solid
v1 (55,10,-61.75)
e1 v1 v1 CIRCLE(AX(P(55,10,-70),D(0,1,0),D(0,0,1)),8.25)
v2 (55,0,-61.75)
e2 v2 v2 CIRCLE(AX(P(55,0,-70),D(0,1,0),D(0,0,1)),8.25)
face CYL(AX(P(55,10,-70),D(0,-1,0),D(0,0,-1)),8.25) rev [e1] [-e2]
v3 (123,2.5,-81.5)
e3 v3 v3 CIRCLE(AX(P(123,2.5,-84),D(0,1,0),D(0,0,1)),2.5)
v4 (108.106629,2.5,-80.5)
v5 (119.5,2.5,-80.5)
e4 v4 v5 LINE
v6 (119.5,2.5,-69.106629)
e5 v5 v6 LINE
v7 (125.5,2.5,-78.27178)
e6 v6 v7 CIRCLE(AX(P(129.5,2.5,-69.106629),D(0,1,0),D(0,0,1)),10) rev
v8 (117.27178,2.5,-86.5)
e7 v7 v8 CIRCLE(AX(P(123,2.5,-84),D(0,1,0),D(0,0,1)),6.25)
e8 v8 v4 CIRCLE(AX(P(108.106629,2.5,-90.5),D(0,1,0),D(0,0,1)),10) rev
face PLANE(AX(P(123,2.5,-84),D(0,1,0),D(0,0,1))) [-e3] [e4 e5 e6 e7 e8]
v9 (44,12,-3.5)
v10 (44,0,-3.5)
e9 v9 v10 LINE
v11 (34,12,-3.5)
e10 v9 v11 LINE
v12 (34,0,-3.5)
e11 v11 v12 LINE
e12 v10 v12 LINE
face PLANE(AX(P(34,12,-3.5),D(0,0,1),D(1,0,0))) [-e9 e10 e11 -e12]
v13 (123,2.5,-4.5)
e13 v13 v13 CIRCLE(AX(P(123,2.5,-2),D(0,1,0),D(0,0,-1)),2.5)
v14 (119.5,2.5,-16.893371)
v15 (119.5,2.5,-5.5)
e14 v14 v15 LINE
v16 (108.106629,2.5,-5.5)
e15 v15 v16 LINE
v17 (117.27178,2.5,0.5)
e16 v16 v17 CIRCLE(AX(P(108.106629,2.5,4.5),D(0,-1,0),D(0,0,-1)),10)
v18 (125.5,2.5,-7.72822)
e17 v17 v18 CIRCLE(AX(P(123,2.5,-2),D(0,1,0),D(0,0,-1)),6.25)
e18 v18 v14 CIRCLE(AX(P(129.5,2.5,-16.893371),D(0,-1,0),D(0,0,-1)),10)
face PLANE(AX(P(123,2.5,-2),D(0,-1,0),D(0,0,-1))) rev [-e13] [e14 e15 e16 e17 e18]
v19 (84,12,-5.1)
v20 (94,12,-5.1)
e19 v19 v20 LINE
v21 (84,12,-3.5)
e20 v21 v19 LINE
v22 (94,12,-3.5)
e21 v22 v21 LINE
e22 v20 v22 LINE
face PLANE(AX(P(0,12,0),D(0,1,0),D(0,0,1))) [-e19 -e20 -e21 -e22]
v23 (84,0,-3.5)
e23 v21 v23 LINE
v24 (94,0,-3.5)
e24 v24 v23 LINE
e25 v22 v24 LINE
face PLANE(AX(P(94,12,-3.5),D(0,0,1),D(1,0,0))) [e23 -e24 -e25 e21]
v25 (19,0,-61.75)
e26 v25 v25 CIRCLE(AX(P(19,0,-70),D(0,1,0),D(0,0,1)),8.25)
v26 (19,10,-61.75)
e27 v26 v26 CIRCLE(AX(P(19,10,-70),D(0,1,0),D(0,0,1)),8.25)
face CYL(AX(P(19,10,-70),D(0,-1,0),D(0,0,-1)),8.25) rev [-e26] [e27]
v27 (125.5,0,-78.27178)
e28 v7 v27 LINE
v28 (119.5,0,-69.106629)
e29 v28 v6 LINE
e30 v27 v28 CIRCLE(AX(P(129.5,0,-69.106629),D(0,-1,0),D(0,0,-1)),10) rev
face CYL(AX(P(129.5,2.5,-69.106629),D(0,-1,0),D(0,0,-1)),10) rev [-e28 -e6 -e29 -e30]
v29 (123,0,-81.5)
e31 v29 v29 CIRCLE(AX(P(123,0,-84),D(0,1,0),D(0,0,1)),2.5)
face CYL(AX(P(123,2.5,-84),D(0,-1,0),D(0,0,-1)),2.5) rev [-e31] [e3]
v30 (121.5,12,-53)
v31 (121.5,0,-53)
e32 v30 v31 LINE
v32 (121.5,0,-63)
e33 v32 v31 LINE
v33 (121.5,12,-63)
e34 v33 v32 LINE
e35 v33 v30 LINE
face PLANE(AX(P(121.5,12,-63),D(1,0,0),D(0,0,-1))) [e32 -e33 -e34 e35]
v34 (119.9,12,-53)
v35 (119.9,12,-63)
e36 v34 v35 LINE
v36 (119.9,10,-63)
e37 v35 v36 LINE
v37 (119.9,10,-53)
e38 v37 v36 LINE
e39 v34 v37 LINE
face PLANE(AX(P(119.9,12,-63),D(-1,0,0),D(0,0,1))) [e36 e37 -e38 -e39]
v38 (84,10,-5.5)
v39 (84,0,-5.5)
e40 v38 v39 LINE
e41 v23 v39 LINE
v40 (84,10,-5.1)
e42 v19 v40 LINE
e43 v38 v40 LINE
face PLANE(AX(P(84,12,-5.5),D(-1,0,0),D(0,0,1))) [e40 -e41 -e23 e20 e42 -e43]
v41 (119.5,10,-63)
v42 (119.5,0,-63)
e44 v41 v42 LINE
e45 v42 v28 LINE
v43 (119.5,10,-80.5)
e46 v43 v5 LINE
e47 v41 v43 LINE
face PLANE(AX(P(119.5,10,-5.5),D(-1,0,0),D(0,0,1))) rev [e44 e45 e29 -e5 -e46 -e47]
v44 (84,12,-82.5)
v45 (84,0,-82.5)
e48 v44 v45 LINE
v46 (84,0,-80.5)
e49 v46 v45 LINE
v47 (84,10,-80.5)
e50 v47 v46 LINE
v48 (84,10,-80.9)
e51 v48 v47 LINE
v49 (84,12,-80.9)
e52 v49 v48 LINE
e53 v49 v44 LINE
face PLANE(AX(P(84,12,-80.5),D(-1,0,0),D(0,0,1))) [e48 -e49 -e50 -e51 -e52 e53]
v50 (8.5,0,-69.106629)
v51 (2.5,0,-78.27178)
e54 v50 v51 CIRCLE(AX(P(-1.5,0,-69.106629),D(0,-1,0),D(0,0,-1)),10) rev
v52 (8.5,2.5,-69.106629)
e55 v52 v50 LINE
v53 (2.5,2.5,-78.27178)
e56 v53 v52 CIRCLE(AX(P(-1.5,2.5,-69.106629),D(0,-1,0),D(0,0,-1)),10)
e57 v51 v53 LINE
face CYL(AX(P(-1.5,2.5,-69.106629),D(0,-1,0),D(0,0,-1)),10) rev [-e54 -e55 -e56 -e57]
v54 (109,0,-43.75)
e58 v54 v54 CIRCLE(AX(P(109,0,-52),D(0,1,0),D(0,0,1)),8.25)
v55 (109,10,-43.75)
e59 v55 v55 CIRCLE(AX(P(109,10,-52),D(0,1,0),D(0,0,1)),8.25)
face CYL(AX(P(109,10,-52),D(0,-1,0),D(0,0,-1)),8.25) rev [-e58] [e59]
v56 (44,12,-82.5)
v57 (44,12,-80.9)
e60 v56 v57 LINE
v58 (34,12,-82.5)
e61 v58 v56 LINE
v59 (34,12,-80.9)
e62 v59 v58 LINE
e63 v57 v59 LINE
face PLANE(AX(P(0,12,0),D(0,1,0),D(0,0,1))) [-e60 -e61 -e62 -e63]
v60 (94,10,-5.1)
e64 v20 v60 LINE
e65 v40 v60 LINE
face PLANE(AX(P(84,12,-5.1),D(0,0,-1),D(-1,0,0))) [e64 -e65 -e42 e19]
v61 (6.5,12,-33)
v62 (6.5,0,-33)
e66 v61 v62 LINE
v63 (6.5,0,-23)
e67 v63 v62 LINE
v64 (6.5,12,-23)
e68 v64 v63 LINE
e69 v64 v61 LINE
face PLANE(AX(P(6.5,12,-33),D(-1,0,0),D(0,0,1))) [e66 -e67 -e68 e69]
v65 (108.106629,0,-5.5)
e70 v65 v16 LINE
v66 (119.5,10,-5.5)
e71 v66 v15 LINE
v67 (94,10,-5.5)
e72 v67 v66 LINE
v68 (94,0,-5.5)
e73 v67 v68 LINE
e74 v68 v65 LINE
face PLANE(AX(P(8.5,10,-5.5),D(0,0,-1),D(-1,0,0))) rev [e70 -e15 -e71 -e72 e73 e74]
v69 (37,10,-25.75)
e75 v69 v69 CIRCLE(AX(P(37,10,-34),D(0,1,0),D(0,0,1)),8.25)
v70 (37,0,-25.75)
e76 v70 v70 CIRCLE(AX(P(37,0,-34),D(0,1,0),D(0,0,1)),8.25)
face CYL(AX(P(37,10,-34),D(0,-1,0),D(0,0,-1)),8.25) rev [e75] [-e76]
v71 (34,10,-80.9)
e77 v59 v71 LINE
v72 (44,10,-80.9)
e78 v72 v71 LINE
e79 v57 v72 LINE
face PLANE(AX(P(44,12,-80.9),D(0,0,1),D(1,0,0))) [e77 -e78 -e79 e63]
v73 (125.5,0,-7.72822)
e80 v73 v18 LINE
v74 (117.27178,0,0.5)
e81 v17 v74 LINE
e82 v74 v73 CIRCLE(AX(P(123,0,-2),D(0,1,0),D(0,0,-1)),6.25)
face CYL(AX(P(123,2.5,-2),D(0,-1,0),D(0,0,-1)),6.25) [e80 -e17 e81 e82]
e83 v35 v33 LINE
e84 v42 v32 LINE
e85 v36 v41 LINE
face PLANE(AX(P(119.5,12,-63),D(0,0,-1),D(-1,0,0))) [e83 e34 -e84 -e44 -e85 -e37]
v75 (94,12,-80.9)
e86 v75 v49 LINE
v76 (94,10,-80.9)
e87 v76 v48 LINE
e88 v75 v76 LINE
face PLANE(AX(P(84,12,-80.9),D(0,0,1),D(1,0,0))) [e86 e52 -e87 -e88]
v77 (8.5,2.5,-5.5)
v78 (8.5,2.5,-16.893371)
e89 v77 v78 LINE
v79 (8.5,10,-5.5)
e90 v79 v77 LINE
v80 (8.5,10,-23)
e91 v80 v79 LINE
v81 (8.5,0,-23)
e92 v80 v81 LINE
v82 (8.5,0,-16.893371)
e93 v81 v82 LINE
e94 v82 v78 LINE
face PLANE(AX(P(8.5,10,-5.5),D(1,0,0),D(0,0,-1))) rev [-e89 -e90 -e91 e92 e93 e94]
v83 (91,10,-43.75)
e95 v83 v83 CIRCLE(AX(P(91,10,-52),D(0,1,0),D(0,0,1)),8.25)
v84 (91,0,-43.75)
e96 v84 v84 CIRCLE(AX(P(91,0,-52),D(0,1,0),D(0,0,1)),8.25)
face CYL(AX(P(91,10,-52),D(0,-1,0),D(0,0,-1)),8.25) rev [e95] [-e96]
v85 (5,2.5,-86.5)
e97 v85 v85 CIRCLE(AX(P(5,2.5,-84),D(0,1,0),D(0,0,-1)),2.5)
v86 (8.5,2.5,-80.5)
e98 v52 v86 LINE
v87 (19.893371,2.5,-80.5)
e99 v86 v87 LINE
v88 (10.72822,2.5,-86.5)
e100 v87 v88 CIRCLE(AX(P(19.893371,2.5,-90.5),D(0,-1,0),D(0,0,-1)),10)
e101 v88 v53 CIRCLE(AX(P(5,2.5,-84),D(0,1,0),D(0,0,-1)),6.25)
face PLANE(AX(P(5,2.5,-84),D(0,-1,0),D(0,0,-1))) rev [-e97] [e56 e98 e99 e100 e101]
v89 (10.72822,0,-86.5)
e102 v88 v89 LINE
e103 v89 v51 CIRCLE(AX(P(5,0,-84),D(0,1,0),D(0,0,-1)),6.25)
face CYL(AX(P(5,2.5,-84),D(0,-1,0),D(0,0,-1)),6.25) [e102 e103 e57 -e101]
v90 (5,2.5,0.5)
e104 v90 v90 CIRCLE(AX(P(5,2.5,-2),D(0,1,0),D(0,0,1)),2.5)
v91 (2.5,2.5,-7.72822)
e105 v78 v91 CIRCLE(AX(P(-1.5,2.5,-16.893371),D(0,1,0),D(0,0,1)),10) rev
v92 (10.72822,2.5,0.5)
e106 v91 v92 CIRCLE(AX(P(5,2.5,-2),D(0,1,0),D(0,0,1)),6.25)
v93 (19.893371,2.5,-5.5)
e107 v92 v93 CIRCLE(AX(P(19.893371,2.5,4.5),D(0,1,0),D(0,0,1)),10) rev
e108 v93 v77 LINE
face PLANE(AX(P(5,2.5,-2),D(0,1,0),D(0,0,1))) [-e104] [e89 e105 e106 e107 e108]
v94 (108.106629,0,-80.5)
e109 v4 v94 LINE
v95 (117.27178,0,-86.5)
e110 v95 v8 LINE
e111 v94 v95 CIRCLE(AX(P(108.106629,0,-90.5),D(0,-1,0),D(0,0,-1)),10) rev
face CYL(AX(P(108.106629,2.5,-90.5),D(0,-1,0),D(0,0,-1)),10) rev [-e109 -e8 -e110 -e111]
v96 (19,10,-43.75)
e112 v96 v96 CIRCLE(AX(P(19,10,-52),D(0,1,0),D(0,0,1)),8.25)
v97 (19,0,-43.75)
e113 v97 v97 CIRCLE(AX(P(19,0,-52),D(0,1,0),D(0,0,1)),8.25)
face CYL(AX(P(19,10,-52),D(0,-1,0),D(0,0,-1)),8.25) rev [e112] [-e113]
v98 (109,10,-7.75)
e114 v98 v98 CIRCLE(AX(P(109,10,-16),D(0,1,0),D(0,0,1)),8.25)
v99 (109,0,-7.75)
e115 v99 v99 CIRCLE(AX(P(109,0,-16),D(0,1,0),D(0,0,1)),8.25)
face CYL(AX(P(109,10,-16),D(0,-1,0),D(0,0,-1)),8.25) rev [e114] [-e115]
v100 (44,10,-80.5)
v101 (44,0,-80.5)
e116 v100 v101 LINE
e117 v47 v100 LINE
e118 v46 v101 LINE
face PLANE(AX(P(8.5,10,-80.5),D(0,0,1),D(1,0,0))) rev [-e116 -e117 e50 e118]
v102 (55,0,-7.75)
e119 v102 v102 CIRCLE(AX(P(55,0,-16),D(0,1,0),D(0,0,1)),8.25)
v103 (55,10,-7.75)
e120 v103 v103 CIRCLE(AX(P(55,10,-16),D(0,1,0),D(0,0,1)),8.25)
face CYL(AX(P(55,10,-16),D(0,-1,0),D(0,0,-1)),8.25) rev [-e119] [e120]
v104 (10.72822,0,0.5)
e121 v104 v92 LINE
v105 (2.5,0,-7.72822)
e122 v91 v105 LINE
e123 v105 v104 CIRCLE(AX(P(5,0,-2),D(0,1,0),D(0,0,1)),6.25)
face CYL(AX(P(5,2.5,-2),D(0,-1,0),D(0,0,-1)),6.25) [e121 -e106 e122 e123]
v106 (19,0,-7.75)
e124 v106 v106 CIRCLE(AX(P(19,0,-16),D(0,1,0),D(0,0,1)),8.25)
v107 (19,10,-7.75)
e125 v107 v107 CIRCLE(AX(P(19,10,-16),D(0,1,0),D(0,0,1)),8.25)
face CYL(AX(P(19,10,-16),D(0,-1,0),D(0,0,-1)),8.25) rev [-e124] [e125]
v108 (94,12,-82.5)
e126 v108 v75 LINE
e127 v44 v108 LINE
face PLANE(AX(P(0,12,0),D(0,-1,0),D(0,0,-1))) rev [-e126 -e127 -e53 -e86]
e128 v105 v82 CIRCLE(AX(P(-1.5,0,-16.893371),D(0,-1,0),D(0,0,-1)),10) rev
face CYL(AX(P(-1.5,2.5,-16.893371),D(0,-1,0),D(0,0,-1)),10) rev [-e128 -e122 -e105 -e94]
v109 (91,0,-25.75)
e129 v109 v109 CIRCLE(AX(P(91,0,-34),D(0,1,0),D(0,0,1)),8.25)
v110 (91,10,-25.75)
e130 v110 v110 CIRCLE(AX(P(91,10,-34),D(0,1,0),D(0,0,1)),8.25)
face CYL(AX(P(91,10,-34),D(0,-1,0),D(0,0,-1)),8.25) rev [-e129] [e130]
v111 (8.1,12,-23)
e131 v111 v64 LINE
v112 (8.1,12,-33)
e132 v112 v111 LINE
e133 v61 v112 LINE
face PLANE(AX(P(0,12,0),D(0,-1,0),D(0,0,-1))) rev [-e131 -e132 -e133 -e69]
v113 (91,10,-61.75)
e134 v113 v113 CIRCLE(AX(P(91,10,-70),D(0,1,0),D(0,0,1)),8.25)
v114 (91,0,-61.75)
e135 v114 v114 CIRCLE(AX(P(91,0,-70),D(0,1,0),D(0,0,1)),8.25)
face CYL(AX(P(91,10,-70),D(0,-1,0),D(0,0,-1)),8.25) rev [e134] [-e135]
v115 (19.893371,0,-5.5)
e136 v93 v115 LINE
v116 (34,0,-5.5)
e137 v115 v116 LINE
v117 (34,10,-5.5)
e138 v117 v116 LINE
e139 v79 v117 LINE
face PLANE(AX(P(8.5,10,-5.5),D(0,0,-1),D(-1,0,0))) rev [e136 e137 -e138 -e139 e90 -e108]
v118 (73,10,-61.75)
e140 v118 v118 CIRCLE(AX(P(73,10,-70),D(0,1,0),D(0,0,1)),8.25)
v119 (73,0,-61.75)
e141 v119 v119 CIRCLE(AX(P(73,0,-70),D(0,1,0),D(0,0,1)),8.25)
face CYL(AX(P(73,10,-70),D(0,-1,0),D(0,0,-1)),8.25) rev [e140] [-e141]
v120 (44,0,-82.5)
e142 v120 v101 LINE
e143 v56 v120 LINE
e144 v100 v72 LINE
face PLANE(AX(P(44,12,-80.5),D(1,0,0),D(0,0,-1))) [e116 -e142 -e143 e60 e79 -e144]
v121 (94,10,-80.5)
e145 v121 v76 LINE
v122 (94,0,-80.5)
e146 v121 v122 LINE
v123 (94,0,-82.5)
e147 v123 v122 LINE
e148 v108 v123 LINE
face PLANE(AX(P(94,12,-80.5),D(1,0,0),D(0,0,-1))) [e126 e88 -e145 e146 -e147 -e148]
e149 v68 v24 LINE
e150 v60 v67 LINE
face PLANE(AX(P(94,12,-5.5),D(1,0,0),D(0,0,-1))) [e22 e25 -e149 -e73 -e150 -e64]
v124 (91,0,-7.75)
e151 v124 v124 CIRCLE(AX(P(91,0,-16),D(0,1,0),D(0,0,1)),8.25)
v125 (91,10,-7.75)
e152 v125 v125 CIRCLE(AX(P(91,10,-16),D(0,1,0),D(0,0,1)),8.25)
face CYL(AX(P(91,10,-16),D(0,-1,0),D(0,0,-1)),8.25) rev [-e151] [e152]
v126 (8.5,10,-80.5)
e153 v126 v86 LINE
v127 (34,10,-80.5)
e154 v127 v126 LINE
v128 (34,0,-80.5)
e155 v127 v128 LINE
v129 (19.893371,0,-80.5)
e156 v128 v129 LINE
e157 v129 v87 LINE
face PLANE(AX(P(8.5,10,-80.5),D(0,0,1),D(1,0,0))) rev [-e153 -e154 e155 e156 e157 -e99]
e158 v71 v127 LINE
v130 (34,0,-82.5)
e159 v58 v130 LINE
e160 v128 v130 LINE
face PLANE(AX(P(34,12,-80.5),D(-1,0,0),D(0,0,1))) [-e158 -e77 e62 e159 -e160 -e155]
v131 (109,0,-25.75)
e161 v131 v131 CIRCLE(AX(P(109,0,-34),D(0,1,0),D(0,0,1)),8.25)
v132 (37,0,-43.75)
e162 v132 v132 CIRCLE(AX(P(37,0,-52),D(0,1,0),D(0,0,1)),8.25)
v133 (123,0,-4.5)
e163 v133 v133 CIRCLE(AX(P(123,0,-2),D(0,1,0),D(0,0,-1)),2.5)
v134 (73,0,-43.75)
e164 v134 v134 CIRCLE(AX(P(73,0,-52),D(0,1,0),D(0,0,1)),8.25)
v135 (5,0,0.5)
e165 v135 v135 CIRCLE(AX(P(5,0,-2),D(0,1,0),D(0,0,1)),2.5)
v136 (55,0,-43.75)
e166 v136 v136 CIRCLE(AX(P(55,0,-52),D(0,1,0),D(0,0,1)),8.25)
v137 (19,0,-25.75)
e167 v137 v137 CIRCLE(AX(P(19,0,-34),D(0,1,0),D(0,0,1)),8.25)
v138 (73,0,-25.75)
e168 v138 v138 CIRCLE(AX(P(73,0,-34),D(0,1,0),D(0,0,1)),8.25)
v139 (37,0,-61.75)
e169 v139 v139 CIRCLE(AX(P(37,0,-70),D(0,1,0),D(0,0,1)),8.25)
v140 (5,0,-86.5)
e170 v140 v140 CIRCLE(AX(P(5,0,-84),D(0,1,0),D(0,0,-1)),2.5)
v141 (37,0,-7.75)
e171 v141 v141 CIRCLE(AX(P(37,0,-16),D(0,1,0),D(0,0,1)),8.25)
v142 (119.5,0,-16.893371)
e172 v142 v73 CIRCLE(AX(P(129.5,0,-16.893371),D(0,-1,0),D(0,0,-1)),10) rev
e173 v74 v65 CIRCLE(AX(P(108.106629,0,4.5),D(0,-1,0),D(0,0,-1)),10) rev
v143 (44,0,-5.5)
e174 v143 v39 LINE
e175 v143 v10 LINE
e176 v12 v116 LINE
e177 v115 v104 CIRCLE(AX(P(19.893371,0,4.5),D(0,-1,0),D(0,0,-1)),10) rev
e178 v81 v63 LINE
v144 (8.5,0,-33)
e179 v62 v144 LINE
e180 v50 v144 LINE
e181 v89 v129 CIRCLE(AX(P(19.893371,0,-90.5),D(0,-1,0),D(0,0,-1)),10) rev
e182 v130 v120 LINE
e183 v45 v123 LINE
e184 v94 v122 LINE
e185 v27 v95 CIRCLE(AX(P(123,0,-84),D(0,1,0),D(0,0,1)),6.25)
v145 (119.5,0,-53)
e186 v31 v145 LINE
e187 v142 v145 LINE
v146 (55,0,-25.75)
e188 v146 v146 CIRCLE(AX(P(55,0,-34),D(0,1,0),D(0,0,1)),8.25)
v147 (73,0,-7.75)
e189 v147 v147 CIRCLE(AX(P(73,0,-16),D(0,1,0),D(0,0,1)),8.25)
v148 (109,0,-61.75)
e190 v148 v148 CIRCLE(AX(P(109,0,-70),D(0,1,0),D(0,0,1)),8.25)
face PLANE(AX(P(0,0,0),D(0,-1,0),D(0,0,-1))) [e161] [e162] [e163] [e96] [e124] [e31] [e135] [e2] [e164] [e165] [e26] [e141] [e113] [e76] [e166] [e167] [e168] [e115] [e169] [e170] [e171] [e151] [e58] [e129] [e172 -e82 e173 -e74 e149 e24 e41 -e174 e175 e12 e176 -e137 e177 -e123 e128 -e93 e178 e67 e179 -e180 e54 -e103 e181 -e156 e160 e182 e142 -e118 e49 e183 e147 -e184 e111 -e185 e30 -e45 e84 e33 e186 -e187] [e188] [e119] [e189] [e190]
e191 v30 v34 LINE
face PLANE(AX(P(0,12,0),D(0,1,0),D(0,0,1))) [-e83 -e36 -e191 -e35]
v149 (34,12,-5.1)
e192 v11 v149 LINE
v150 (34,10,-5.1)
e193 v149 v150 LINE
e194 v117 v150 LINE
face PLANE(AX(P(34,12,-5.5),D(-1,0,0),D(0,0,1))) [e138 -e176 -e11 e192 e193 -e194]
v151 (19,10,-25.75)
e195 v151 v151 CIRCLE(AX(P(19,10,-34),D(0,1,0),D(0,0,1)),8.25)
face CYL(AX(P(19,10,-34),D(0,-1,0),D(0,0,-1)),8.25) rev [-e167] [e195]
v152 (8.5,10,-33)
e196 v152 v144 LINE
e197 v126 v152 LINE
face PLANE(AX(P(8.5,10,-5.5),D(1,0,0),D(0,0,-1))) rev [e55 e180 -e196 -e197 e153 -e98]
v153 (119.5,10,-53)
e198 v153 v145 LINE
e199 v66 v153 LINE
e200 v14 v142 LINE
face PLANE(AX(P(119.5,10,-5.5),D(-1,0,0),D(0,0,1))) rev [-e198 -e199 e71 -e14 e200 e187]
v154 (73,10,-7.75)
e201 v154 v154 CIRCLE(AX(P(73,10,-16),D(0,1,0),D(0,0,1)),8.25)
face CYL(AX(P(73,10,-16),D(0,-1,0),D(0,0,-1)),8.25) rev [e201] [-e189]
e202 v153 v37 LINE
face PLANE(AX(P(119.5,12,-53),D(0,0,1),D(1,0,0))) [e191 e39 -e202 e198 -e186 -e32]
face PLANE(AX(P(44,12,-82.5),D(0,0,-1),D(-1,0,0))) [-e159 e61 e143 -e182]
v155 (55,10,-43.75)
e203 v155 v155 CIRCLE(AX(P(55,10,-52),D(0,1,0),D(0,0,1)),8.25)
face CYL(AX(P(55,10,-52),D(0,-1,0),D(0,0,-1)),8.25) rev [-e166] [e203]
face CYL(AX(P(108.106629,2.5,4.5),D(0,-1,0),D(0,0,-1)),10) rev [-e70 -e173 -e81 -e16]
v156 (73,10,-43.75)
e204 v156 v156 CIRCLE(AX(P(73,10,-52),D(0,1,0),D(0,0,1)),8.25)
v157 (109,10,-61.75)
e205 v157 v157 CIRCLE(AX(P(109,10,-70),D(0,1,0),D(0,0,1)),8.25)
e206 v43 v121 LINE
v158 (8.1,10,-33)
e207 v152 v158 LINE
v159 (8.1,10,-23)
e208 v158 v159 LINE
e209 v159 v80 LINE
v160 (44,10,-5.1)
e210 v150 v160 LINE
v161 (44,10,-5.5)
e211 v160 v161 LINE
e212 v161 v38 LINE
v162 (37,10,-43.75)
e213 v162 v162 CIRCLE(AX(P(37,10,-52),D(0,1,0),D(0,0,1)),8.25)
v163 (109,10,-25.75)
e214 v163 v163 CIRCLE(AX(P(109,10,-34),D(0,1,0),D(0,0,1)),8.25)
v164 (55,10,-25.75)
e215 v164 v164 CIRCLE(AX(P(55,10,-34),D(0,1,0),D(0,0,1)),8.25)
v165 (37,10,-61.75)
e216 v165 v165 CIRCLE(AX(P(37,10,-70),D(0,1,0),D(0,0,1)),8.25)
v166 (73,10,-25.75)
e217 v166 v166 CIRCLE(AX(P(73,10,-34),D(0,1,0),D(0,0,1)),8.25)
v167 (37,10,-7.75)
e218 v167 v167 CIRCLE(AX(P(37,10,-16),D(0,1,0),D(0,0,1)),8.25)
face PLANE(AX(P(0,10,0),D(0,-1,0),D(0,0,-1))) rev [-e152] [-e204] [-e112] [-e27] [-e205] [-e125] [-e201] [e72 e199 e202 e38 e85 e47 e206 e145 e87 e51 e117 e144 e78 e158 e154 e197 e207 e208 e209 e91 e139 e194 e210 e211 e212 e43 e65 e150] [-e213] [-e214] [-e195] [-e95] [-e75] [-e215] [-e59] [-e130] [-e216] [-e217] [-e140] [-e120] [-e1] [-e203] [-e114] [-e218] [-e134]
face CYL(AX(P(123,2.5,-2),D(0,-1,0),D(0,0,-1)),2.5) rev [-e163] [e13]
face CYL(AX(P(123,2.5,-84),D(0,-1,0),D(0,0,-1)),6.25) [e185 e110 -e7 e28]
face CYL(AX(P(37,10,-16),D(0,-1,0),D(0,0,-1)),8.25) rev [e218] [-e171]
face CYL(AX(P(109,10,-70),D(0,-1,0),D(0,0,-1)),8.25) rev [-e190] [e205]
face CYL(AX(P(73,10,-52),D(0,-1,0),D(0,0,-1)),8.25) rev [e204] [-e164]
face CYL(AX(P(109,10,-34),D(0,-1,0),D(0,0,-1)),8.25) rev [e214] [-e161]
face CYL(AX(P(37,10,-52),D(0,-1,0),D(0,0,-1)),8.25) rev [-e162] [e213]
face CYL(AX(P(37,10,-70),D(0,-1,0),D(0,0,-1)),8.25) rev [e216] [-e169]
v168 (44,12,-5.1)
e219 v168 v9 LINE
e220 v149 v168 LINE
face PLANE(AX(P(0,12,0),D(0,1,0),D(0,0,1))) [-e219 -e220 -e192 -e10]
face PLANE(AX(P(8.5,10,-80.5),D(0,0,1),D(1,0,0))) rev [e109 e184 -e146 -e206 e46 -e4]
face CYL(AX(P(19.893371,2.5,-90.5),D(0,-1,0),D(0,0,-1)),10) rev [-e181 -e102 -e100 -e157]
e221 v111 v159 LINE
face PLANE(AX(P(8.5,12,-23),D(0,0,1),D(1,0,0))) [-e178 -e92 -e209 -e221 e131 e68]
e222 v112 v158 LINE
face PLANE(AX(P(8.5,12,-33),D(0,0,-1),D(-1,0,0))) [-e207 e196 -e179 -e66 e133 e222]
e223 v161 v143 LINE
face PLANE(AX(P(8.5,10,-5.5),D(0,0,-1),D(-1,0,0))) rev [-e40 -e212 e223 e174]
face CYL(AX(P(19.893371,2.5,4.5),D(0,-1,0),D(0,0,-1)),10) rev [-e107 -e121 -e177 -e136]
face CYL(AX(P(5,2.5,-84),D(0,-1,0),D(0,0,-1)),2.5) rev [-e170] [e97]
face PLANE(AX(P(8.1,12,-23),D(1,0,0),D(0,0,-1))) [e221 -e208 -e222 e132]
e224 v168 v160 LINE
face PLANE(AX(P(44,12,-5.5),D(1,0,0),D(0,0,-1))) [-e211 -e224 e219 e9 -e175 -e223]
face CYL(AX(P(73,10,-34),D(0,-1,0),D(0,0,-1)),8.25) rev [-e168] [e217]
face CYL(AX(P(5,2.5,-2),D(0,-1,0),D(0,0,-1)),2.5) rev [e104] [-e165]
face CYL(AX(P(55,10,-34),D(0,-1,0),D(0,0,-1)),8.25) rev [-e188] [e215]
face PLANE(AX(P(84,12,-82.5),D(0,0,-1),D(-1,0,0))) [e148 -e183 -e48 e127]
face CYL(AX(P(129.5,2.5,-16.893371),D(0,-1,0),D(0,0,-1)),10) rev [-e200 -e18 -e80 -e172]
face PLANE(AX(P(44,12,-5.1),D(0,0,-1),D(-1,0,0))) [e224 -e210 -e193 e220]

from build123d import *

# Parameters (mm, degrees)
SKETCH3_W              = 111
SKETCH3_H              = 75
SKETCH3_R              = 8.25
WELL_LIGHT_GUIDE_DEPTH = 10
SKETCH1_R              = 2.5
PCB_MOUNT_PLATE_DEPTH  = 2.5
SKETCH4_W              = 10
SKETCH4_H              = 2
SKETCH4_W_2            = 2
SKETCH4_H_2            = 10
TOP_GUIDE_TABS_DEPTH   = 12
SKETCH5_W              = 10
SKETCH5_H              = 0.4
SKETCH5_W_2            = 0.4
SKETCH5_H_2            = 10
F_3DPRINT_SPACER_DEPTH = 158.95766838
FILLET1_R              = 10


with BuildPart() as part:
    # Sketch3 → Well light guide (new body)
    with BuildSketch(Plane(origin=(0, 0, 0), x_dir=(1, 0, 0), z_dir=(0, 1, 0))):
        with Locations((64, 43)):
            Rectangle(SKETCH3_W, SKETCH3_H)
        with Locations(Location((19, 70, 0), (0, 0, 270))):
            Circle(SKETCH3_R, mode=Mode.SUBTRACT)
        with Locations(Location((37, 70, 0), (0, 0, 270))):
            Circle(SKETCH3_R, mode=Mode.SUBTRACT)
        with Locations(Location((55, 70, 0), (0, 0, 270))):
            Circle(SKETCH3_R, mode=Mode.SUBTRACT)
        with Locations(Location((73, 70, 0), (0, 0, 270))):
            Circle(SKETCH3_R, mode=Mode.SUBTRACT)
        with Locations(Location((91, 70, 0), (0, 0, 270))):
            Circle(SKETCH3_R, mode=Mode.SUBTRACT)
        with Locations(Location((109, 70, 0), (0, 0, 270))):
            Circle(SKETCH3_R, mode=Mode.SUBTRACT)
        with Locations(Location((37, 52, 0), (0, 0, 270))):
            Circle(SKETCH3_R, mode=Mode.SUBTRACT)
        with Locations(Location((55, 52, 0), (0, 0, 270))):
            Circle(SKETCH3_R, mode=Mode.SUBTRACT)
        with Locations(Location((73, 52, 0), (0, 0, 270))):
            Circle(SKETCH3_R, mode=Mode.SUBTRACT)
        with Locations(Location((91, 52, 0), (0, 0, 270))):
            Circle(SKETCH3_R, mode=Mode.SUBTRACT)
        with Locations(Location((109, 52, 0), (0, 0, 270))):
            Circle(SKETCH3_R, mode=Mode.SUBTRACT)
        with Locations(Location((37, 34, 0), (0, 0, 270))):
            Circle(SKETCH3_R, mode=Mode.SUBTRACT)
        with Locations(Location((55, 34, 0), (0, 0, 270))):
            Circle(SKETCH3_R, mode=Mode.SUBTRACT)
        with Locations(Location((73, 34, 0), (0, 0, 270))):
            Circle(SKETCH3_R, mode=Mode.SUBTRACT)
        with Locations(Location((91, 34, 0), (0, 0, 270))):
            Circle(SKETCH3_R, mode=Mode.SUBTRACT)
        with Locations(Location((109, 34, 0), (0, 0, 270))):
            Circle(SKETCH3_R, mode=Mode.SUBTRACT)
        with Locations(Location((37, 16, 0), (0, 0, 270))):
            Circle(SKETCH3_R, mode=Mode.SUBTRACT)
        with Locations(Location((55, 16, 0), (0, 0, 270))):
            Circle(SKETCH3_R, mode=Mode.SUBTRACT)
        with Locations(Location((73, 16, 0), (0, 0, 270))):
            Circle(SKETCH3_R, mode=Mode.SUBTRACT)
        with Locations(Location((91, 16, 0), (0, 0, 270))):
            Circle(SKETCH3_R, mode=Mode.SUBTRACT)
        with Locations(Location((109, 16, 0), (0, 0, 270))):
            Circle(SKETCH3_R, mode=Mode.SUBTRACT)
        with Locations(Location((19, 52, 0), (0, 0, 270))):
            Circle(SKETCH3_R, mode=Mode.SUBTRACT)
        with Locations(Location((19, 34, 0), (0, 0, 270))):
            Circle(SKETCH3_R, mode=Mode.SUBTRACT)
        with Locations(Location((19, 16, 0), (0, 0, 270))):
            Circle(SKETCH3_R, mode=Mode.SUBTRACT)
    extrude(amount=WELL_LIGHT_GUIDE_DEPTH)

    # Sketch1 → PCB mount plate (add)
    # profile 1 of 4: a face of its own
    with BuildSketch(Plane(origin=(0, 0, 0), x_dir=(1, 0, 0), z_dir=(0, 1, 0))):
        with BuildLine():
            Line((116.75, 84), (116.75, 80.5))
            Line((116.75, 80.5), (119.5, 80.5))
            Line((119.5, 80.5), (119.5, 77.75))
            Line((119.5, 77.75), (123, 77.75))
            ThreePointArc((123, 77.75), (127.419417382, 88.419417382), (116.75, 84))
        make_face()
        with Locations(Location((123, 84, 0), (0, 0, 270))):
            Circle(SKETCH1_R, mode=Mode.SUBTRACT)
    # profile 2 of 4: a face of its own
    with BuildSketch(Plane(origin=(0, 0, 0), x_dir=(1, 0, 0), z_dir=(0, 1, 0))):
        with BuildLine():
            Line((11.25, 84), (11.25, 80.5))
            Line((11.25, 80.5), (8.5, 80.5))
            Line((8.5, 80.5), (8.5, 77.75))
            Line((8.5, 77.75), (5, 77.75))
            ThreePointArc((5, 77.75), (0.580582618, 88.419417382), (11.25, 84))
        make_face()
        with Locations(Location((5, 84, 0), (0, 0, 90))):
            Circle(SKETCH1_R, mode=Mode.SUBTRACT)
    # profile 3 of 4: a face of its own
    with BuildSketch(Plane(origin=(0, 0, 0), x_dir=(1, 0, 0), z_dir=(0, 1, 0))):
        with BuildLine():
            Line((11.25, 2), (11.25, 5.5))
            Line((11.25, 5.5), (8.5, 5.5))
            Line((8.5, 5.5), (8.5, 8.25))
            Line((8.5, 8.25), (5, 8.25))
            ThreePointArc((5, 8.25), (0.580582618, -2.419417382), (11.25, 2))
        make_face()
        with Locations(Location((5, 2, 0), (0, 0, 270))):
            Circle(SKETCH1_R, mode=Mode.SUBTRACT)
    # profile 4 of 4: a face of its own
    with BuildSketch(Plane(origin=(0, 0, 0), x_dir=(1, 0, 0), z_dir=(0, 1, 0))):
        with BuildLine():
            Line((119.5, 5.5), (116.75, 5.5))
            Line((116.75, 5.5), (116.75, 2))
            ThreePointArc((116.75, 2), (127.419417382, -2.419417382), (123, 8.25))
            Line((123, 8.25), (119.5, 8.25))
            Line((119.5, 8.25), (119.5, 5.5))
        make_face()
        with Locations(Location((123, 2, 0), (0, 0, 90))):
            Circle(SKETCH1_R, mode=Mode.SUBTRACT)
    extrude(amount=PCB_MOUNT_PLATE_DEPTH)

    # Sketch4 → Top guide tabs (add)
    with BuildSketch(Plane.XZ):
        with Locations((39, -81.5)):
            Rectangle(SKETCH4_W, SKETCH4_H)
        with Locations((89, -4.5)):
            Rectangle(SKETCH4_W, SKETCH4_H)
        with Locations((7.5, -28)):
            Rectangle(SKETCH4_W_2, SKETCH4_H_2)
        with Locations((120.5, -58)):
            Rectangle(SKETCH4_W_2, SKETCH4_H_2)
        with Locations((39, -4.5)):
            Rectangle(SKETCH4_W, SKETCH4_H)
        with Locations((89, -81.5)):
            Rectangle(SKETCH4_W, SKETCH4_H)
    extrude(amount=-TOP_GUIDE_TABS_DEPTH)

    # Sketch5 → 3Dprint spacer (cut, through all)
    with BuildSketch(Plane(origin=(0, 10, 0), x_dir=(1, 0, 0), z_dir=(0, 1, 0))):
        with Locations((89, 80.7)):
            Rectangle(SKETCH5_W, SKETCH5_H)
        with Locations((89, 5.3)):
            Rectangle(SKETCH5_W, SKETCH5_H)
        with Locations((119.7, 58)):
            Rectangle(SKETCH5_W_2, SKETCH5_H_2)
        with Locations((39, 80.7)):
            Rectangle(SKETCH5_W, SKETCH5_H)
        with Locations((39, 5.3)):
            Rectangle(SKETCH5_W, SKETCH5_H)
        with Locations((8.3, 28)):
            Rectangle(SKETCH5_W_2, SKETCH5_H_2)
    extrude(amount=F_3DPRINT_SPACER_DEPTH, mode=Mode.SUBTRACT)

    # Fillet1
    # the kernel refuses this fillet: 10 mm, written as the material it adds along each edge
    with BuildSketch(Plane(origin=(116.75, 0, -80.5), x_dir=(0.0866364142554912, 0, -0.9962399970513885), z_dir=(0, 1, 0)), Plane(origin=(119.5, 0, -8.25), x_dir=(0.9962399970513889, 0, 0.08663641425548835), z_dir=(0, 1, 0)), Plane(origin=(8.5, 0, -77.75), x_dir=(-0.9962399970513889, 0, -0.08663641425548864), z_dir=(0, 1, 0))) as fillet1_piece_1:
        with BuildLine():
            CenterArc((9.213569299, 9.477236051), FILLET1_R, 184.970131688, 66.421821522)
            Line((-0.748830671, 8.610871908), (-1.745070668, 8.524235494))
            Line((-1.745070668, 8.524235494), (-0.996239997, -0.086636414))
            Line((-0.996239997, -0.086636414), (0.086636414, -0.996239997))
            ThreePointArc((0.086636414, -0.996239997), (3.573476404, -0.693012547), (5.70355275, -0.947723605))
            Line((5.70355275, -0.947723605), (6.022645164, 0))
        make_face()
    extrude(amount=2.5)
    with BuildSketch(Plane(origin=(119.5, 0, -77.75), x_dir=(0, 0, 1), z_dir=(0, 1, 0)), Plane(origin=(116.75, 0, -5.5), x_dir=(-1, 0, 0), z_dir=(0, 1, 0)), Plane(origin=(8.5, 0, -8.25), x_dir=(0, 0, -1), z_dir=(0, 1, 0)), Plane(origin=(11.25, 0, -80.5), x_dir=(1, 0, 0), z_dir=(0, 1, 0))) as fillet1_piece_2:
        with BuildLine():
            CenterArc((8.643371009, 10), FILLET1_R, 203.578178478, 66.421821522)
            Line((-0.521780381, 6), (-1.43829552, 5.6))
            ThreePointArc((-1.43829552, 5.6), (-1, 3.5), (-1, 0))
            Line((-1, 0), (0, -1))
            Line((0, -1), (8.643371009, -1))
            Line((8.643371009, -1), (8.643371009, 0))
        make_face()
    extrude(amount=2.5)
    with BuildSketch(Plane(origin=(11.25, 0, -5.5), x_dir=(1, 0, 0), z_dir=(0, 1, 0))) as fillet1_piece_3:
        with BuildLine():
            CenterArc((8.643371009, -10), FILLET1_R, 90, 66.421821522)
            Line((-0.521780381, -6), (-1.43829552, -5.6))
            ThreePointArc((-1.43829552, -5.6), (-1, -3.5), (-1, 0))
            Line((-1, 0), (0, 1))
            Line((0, 1), (8.643371009, 1))
            Line((8.643371009, 1), (8.643371009, 0))
        make_face()
    extrude(amount=2.5)


solid = part.part
